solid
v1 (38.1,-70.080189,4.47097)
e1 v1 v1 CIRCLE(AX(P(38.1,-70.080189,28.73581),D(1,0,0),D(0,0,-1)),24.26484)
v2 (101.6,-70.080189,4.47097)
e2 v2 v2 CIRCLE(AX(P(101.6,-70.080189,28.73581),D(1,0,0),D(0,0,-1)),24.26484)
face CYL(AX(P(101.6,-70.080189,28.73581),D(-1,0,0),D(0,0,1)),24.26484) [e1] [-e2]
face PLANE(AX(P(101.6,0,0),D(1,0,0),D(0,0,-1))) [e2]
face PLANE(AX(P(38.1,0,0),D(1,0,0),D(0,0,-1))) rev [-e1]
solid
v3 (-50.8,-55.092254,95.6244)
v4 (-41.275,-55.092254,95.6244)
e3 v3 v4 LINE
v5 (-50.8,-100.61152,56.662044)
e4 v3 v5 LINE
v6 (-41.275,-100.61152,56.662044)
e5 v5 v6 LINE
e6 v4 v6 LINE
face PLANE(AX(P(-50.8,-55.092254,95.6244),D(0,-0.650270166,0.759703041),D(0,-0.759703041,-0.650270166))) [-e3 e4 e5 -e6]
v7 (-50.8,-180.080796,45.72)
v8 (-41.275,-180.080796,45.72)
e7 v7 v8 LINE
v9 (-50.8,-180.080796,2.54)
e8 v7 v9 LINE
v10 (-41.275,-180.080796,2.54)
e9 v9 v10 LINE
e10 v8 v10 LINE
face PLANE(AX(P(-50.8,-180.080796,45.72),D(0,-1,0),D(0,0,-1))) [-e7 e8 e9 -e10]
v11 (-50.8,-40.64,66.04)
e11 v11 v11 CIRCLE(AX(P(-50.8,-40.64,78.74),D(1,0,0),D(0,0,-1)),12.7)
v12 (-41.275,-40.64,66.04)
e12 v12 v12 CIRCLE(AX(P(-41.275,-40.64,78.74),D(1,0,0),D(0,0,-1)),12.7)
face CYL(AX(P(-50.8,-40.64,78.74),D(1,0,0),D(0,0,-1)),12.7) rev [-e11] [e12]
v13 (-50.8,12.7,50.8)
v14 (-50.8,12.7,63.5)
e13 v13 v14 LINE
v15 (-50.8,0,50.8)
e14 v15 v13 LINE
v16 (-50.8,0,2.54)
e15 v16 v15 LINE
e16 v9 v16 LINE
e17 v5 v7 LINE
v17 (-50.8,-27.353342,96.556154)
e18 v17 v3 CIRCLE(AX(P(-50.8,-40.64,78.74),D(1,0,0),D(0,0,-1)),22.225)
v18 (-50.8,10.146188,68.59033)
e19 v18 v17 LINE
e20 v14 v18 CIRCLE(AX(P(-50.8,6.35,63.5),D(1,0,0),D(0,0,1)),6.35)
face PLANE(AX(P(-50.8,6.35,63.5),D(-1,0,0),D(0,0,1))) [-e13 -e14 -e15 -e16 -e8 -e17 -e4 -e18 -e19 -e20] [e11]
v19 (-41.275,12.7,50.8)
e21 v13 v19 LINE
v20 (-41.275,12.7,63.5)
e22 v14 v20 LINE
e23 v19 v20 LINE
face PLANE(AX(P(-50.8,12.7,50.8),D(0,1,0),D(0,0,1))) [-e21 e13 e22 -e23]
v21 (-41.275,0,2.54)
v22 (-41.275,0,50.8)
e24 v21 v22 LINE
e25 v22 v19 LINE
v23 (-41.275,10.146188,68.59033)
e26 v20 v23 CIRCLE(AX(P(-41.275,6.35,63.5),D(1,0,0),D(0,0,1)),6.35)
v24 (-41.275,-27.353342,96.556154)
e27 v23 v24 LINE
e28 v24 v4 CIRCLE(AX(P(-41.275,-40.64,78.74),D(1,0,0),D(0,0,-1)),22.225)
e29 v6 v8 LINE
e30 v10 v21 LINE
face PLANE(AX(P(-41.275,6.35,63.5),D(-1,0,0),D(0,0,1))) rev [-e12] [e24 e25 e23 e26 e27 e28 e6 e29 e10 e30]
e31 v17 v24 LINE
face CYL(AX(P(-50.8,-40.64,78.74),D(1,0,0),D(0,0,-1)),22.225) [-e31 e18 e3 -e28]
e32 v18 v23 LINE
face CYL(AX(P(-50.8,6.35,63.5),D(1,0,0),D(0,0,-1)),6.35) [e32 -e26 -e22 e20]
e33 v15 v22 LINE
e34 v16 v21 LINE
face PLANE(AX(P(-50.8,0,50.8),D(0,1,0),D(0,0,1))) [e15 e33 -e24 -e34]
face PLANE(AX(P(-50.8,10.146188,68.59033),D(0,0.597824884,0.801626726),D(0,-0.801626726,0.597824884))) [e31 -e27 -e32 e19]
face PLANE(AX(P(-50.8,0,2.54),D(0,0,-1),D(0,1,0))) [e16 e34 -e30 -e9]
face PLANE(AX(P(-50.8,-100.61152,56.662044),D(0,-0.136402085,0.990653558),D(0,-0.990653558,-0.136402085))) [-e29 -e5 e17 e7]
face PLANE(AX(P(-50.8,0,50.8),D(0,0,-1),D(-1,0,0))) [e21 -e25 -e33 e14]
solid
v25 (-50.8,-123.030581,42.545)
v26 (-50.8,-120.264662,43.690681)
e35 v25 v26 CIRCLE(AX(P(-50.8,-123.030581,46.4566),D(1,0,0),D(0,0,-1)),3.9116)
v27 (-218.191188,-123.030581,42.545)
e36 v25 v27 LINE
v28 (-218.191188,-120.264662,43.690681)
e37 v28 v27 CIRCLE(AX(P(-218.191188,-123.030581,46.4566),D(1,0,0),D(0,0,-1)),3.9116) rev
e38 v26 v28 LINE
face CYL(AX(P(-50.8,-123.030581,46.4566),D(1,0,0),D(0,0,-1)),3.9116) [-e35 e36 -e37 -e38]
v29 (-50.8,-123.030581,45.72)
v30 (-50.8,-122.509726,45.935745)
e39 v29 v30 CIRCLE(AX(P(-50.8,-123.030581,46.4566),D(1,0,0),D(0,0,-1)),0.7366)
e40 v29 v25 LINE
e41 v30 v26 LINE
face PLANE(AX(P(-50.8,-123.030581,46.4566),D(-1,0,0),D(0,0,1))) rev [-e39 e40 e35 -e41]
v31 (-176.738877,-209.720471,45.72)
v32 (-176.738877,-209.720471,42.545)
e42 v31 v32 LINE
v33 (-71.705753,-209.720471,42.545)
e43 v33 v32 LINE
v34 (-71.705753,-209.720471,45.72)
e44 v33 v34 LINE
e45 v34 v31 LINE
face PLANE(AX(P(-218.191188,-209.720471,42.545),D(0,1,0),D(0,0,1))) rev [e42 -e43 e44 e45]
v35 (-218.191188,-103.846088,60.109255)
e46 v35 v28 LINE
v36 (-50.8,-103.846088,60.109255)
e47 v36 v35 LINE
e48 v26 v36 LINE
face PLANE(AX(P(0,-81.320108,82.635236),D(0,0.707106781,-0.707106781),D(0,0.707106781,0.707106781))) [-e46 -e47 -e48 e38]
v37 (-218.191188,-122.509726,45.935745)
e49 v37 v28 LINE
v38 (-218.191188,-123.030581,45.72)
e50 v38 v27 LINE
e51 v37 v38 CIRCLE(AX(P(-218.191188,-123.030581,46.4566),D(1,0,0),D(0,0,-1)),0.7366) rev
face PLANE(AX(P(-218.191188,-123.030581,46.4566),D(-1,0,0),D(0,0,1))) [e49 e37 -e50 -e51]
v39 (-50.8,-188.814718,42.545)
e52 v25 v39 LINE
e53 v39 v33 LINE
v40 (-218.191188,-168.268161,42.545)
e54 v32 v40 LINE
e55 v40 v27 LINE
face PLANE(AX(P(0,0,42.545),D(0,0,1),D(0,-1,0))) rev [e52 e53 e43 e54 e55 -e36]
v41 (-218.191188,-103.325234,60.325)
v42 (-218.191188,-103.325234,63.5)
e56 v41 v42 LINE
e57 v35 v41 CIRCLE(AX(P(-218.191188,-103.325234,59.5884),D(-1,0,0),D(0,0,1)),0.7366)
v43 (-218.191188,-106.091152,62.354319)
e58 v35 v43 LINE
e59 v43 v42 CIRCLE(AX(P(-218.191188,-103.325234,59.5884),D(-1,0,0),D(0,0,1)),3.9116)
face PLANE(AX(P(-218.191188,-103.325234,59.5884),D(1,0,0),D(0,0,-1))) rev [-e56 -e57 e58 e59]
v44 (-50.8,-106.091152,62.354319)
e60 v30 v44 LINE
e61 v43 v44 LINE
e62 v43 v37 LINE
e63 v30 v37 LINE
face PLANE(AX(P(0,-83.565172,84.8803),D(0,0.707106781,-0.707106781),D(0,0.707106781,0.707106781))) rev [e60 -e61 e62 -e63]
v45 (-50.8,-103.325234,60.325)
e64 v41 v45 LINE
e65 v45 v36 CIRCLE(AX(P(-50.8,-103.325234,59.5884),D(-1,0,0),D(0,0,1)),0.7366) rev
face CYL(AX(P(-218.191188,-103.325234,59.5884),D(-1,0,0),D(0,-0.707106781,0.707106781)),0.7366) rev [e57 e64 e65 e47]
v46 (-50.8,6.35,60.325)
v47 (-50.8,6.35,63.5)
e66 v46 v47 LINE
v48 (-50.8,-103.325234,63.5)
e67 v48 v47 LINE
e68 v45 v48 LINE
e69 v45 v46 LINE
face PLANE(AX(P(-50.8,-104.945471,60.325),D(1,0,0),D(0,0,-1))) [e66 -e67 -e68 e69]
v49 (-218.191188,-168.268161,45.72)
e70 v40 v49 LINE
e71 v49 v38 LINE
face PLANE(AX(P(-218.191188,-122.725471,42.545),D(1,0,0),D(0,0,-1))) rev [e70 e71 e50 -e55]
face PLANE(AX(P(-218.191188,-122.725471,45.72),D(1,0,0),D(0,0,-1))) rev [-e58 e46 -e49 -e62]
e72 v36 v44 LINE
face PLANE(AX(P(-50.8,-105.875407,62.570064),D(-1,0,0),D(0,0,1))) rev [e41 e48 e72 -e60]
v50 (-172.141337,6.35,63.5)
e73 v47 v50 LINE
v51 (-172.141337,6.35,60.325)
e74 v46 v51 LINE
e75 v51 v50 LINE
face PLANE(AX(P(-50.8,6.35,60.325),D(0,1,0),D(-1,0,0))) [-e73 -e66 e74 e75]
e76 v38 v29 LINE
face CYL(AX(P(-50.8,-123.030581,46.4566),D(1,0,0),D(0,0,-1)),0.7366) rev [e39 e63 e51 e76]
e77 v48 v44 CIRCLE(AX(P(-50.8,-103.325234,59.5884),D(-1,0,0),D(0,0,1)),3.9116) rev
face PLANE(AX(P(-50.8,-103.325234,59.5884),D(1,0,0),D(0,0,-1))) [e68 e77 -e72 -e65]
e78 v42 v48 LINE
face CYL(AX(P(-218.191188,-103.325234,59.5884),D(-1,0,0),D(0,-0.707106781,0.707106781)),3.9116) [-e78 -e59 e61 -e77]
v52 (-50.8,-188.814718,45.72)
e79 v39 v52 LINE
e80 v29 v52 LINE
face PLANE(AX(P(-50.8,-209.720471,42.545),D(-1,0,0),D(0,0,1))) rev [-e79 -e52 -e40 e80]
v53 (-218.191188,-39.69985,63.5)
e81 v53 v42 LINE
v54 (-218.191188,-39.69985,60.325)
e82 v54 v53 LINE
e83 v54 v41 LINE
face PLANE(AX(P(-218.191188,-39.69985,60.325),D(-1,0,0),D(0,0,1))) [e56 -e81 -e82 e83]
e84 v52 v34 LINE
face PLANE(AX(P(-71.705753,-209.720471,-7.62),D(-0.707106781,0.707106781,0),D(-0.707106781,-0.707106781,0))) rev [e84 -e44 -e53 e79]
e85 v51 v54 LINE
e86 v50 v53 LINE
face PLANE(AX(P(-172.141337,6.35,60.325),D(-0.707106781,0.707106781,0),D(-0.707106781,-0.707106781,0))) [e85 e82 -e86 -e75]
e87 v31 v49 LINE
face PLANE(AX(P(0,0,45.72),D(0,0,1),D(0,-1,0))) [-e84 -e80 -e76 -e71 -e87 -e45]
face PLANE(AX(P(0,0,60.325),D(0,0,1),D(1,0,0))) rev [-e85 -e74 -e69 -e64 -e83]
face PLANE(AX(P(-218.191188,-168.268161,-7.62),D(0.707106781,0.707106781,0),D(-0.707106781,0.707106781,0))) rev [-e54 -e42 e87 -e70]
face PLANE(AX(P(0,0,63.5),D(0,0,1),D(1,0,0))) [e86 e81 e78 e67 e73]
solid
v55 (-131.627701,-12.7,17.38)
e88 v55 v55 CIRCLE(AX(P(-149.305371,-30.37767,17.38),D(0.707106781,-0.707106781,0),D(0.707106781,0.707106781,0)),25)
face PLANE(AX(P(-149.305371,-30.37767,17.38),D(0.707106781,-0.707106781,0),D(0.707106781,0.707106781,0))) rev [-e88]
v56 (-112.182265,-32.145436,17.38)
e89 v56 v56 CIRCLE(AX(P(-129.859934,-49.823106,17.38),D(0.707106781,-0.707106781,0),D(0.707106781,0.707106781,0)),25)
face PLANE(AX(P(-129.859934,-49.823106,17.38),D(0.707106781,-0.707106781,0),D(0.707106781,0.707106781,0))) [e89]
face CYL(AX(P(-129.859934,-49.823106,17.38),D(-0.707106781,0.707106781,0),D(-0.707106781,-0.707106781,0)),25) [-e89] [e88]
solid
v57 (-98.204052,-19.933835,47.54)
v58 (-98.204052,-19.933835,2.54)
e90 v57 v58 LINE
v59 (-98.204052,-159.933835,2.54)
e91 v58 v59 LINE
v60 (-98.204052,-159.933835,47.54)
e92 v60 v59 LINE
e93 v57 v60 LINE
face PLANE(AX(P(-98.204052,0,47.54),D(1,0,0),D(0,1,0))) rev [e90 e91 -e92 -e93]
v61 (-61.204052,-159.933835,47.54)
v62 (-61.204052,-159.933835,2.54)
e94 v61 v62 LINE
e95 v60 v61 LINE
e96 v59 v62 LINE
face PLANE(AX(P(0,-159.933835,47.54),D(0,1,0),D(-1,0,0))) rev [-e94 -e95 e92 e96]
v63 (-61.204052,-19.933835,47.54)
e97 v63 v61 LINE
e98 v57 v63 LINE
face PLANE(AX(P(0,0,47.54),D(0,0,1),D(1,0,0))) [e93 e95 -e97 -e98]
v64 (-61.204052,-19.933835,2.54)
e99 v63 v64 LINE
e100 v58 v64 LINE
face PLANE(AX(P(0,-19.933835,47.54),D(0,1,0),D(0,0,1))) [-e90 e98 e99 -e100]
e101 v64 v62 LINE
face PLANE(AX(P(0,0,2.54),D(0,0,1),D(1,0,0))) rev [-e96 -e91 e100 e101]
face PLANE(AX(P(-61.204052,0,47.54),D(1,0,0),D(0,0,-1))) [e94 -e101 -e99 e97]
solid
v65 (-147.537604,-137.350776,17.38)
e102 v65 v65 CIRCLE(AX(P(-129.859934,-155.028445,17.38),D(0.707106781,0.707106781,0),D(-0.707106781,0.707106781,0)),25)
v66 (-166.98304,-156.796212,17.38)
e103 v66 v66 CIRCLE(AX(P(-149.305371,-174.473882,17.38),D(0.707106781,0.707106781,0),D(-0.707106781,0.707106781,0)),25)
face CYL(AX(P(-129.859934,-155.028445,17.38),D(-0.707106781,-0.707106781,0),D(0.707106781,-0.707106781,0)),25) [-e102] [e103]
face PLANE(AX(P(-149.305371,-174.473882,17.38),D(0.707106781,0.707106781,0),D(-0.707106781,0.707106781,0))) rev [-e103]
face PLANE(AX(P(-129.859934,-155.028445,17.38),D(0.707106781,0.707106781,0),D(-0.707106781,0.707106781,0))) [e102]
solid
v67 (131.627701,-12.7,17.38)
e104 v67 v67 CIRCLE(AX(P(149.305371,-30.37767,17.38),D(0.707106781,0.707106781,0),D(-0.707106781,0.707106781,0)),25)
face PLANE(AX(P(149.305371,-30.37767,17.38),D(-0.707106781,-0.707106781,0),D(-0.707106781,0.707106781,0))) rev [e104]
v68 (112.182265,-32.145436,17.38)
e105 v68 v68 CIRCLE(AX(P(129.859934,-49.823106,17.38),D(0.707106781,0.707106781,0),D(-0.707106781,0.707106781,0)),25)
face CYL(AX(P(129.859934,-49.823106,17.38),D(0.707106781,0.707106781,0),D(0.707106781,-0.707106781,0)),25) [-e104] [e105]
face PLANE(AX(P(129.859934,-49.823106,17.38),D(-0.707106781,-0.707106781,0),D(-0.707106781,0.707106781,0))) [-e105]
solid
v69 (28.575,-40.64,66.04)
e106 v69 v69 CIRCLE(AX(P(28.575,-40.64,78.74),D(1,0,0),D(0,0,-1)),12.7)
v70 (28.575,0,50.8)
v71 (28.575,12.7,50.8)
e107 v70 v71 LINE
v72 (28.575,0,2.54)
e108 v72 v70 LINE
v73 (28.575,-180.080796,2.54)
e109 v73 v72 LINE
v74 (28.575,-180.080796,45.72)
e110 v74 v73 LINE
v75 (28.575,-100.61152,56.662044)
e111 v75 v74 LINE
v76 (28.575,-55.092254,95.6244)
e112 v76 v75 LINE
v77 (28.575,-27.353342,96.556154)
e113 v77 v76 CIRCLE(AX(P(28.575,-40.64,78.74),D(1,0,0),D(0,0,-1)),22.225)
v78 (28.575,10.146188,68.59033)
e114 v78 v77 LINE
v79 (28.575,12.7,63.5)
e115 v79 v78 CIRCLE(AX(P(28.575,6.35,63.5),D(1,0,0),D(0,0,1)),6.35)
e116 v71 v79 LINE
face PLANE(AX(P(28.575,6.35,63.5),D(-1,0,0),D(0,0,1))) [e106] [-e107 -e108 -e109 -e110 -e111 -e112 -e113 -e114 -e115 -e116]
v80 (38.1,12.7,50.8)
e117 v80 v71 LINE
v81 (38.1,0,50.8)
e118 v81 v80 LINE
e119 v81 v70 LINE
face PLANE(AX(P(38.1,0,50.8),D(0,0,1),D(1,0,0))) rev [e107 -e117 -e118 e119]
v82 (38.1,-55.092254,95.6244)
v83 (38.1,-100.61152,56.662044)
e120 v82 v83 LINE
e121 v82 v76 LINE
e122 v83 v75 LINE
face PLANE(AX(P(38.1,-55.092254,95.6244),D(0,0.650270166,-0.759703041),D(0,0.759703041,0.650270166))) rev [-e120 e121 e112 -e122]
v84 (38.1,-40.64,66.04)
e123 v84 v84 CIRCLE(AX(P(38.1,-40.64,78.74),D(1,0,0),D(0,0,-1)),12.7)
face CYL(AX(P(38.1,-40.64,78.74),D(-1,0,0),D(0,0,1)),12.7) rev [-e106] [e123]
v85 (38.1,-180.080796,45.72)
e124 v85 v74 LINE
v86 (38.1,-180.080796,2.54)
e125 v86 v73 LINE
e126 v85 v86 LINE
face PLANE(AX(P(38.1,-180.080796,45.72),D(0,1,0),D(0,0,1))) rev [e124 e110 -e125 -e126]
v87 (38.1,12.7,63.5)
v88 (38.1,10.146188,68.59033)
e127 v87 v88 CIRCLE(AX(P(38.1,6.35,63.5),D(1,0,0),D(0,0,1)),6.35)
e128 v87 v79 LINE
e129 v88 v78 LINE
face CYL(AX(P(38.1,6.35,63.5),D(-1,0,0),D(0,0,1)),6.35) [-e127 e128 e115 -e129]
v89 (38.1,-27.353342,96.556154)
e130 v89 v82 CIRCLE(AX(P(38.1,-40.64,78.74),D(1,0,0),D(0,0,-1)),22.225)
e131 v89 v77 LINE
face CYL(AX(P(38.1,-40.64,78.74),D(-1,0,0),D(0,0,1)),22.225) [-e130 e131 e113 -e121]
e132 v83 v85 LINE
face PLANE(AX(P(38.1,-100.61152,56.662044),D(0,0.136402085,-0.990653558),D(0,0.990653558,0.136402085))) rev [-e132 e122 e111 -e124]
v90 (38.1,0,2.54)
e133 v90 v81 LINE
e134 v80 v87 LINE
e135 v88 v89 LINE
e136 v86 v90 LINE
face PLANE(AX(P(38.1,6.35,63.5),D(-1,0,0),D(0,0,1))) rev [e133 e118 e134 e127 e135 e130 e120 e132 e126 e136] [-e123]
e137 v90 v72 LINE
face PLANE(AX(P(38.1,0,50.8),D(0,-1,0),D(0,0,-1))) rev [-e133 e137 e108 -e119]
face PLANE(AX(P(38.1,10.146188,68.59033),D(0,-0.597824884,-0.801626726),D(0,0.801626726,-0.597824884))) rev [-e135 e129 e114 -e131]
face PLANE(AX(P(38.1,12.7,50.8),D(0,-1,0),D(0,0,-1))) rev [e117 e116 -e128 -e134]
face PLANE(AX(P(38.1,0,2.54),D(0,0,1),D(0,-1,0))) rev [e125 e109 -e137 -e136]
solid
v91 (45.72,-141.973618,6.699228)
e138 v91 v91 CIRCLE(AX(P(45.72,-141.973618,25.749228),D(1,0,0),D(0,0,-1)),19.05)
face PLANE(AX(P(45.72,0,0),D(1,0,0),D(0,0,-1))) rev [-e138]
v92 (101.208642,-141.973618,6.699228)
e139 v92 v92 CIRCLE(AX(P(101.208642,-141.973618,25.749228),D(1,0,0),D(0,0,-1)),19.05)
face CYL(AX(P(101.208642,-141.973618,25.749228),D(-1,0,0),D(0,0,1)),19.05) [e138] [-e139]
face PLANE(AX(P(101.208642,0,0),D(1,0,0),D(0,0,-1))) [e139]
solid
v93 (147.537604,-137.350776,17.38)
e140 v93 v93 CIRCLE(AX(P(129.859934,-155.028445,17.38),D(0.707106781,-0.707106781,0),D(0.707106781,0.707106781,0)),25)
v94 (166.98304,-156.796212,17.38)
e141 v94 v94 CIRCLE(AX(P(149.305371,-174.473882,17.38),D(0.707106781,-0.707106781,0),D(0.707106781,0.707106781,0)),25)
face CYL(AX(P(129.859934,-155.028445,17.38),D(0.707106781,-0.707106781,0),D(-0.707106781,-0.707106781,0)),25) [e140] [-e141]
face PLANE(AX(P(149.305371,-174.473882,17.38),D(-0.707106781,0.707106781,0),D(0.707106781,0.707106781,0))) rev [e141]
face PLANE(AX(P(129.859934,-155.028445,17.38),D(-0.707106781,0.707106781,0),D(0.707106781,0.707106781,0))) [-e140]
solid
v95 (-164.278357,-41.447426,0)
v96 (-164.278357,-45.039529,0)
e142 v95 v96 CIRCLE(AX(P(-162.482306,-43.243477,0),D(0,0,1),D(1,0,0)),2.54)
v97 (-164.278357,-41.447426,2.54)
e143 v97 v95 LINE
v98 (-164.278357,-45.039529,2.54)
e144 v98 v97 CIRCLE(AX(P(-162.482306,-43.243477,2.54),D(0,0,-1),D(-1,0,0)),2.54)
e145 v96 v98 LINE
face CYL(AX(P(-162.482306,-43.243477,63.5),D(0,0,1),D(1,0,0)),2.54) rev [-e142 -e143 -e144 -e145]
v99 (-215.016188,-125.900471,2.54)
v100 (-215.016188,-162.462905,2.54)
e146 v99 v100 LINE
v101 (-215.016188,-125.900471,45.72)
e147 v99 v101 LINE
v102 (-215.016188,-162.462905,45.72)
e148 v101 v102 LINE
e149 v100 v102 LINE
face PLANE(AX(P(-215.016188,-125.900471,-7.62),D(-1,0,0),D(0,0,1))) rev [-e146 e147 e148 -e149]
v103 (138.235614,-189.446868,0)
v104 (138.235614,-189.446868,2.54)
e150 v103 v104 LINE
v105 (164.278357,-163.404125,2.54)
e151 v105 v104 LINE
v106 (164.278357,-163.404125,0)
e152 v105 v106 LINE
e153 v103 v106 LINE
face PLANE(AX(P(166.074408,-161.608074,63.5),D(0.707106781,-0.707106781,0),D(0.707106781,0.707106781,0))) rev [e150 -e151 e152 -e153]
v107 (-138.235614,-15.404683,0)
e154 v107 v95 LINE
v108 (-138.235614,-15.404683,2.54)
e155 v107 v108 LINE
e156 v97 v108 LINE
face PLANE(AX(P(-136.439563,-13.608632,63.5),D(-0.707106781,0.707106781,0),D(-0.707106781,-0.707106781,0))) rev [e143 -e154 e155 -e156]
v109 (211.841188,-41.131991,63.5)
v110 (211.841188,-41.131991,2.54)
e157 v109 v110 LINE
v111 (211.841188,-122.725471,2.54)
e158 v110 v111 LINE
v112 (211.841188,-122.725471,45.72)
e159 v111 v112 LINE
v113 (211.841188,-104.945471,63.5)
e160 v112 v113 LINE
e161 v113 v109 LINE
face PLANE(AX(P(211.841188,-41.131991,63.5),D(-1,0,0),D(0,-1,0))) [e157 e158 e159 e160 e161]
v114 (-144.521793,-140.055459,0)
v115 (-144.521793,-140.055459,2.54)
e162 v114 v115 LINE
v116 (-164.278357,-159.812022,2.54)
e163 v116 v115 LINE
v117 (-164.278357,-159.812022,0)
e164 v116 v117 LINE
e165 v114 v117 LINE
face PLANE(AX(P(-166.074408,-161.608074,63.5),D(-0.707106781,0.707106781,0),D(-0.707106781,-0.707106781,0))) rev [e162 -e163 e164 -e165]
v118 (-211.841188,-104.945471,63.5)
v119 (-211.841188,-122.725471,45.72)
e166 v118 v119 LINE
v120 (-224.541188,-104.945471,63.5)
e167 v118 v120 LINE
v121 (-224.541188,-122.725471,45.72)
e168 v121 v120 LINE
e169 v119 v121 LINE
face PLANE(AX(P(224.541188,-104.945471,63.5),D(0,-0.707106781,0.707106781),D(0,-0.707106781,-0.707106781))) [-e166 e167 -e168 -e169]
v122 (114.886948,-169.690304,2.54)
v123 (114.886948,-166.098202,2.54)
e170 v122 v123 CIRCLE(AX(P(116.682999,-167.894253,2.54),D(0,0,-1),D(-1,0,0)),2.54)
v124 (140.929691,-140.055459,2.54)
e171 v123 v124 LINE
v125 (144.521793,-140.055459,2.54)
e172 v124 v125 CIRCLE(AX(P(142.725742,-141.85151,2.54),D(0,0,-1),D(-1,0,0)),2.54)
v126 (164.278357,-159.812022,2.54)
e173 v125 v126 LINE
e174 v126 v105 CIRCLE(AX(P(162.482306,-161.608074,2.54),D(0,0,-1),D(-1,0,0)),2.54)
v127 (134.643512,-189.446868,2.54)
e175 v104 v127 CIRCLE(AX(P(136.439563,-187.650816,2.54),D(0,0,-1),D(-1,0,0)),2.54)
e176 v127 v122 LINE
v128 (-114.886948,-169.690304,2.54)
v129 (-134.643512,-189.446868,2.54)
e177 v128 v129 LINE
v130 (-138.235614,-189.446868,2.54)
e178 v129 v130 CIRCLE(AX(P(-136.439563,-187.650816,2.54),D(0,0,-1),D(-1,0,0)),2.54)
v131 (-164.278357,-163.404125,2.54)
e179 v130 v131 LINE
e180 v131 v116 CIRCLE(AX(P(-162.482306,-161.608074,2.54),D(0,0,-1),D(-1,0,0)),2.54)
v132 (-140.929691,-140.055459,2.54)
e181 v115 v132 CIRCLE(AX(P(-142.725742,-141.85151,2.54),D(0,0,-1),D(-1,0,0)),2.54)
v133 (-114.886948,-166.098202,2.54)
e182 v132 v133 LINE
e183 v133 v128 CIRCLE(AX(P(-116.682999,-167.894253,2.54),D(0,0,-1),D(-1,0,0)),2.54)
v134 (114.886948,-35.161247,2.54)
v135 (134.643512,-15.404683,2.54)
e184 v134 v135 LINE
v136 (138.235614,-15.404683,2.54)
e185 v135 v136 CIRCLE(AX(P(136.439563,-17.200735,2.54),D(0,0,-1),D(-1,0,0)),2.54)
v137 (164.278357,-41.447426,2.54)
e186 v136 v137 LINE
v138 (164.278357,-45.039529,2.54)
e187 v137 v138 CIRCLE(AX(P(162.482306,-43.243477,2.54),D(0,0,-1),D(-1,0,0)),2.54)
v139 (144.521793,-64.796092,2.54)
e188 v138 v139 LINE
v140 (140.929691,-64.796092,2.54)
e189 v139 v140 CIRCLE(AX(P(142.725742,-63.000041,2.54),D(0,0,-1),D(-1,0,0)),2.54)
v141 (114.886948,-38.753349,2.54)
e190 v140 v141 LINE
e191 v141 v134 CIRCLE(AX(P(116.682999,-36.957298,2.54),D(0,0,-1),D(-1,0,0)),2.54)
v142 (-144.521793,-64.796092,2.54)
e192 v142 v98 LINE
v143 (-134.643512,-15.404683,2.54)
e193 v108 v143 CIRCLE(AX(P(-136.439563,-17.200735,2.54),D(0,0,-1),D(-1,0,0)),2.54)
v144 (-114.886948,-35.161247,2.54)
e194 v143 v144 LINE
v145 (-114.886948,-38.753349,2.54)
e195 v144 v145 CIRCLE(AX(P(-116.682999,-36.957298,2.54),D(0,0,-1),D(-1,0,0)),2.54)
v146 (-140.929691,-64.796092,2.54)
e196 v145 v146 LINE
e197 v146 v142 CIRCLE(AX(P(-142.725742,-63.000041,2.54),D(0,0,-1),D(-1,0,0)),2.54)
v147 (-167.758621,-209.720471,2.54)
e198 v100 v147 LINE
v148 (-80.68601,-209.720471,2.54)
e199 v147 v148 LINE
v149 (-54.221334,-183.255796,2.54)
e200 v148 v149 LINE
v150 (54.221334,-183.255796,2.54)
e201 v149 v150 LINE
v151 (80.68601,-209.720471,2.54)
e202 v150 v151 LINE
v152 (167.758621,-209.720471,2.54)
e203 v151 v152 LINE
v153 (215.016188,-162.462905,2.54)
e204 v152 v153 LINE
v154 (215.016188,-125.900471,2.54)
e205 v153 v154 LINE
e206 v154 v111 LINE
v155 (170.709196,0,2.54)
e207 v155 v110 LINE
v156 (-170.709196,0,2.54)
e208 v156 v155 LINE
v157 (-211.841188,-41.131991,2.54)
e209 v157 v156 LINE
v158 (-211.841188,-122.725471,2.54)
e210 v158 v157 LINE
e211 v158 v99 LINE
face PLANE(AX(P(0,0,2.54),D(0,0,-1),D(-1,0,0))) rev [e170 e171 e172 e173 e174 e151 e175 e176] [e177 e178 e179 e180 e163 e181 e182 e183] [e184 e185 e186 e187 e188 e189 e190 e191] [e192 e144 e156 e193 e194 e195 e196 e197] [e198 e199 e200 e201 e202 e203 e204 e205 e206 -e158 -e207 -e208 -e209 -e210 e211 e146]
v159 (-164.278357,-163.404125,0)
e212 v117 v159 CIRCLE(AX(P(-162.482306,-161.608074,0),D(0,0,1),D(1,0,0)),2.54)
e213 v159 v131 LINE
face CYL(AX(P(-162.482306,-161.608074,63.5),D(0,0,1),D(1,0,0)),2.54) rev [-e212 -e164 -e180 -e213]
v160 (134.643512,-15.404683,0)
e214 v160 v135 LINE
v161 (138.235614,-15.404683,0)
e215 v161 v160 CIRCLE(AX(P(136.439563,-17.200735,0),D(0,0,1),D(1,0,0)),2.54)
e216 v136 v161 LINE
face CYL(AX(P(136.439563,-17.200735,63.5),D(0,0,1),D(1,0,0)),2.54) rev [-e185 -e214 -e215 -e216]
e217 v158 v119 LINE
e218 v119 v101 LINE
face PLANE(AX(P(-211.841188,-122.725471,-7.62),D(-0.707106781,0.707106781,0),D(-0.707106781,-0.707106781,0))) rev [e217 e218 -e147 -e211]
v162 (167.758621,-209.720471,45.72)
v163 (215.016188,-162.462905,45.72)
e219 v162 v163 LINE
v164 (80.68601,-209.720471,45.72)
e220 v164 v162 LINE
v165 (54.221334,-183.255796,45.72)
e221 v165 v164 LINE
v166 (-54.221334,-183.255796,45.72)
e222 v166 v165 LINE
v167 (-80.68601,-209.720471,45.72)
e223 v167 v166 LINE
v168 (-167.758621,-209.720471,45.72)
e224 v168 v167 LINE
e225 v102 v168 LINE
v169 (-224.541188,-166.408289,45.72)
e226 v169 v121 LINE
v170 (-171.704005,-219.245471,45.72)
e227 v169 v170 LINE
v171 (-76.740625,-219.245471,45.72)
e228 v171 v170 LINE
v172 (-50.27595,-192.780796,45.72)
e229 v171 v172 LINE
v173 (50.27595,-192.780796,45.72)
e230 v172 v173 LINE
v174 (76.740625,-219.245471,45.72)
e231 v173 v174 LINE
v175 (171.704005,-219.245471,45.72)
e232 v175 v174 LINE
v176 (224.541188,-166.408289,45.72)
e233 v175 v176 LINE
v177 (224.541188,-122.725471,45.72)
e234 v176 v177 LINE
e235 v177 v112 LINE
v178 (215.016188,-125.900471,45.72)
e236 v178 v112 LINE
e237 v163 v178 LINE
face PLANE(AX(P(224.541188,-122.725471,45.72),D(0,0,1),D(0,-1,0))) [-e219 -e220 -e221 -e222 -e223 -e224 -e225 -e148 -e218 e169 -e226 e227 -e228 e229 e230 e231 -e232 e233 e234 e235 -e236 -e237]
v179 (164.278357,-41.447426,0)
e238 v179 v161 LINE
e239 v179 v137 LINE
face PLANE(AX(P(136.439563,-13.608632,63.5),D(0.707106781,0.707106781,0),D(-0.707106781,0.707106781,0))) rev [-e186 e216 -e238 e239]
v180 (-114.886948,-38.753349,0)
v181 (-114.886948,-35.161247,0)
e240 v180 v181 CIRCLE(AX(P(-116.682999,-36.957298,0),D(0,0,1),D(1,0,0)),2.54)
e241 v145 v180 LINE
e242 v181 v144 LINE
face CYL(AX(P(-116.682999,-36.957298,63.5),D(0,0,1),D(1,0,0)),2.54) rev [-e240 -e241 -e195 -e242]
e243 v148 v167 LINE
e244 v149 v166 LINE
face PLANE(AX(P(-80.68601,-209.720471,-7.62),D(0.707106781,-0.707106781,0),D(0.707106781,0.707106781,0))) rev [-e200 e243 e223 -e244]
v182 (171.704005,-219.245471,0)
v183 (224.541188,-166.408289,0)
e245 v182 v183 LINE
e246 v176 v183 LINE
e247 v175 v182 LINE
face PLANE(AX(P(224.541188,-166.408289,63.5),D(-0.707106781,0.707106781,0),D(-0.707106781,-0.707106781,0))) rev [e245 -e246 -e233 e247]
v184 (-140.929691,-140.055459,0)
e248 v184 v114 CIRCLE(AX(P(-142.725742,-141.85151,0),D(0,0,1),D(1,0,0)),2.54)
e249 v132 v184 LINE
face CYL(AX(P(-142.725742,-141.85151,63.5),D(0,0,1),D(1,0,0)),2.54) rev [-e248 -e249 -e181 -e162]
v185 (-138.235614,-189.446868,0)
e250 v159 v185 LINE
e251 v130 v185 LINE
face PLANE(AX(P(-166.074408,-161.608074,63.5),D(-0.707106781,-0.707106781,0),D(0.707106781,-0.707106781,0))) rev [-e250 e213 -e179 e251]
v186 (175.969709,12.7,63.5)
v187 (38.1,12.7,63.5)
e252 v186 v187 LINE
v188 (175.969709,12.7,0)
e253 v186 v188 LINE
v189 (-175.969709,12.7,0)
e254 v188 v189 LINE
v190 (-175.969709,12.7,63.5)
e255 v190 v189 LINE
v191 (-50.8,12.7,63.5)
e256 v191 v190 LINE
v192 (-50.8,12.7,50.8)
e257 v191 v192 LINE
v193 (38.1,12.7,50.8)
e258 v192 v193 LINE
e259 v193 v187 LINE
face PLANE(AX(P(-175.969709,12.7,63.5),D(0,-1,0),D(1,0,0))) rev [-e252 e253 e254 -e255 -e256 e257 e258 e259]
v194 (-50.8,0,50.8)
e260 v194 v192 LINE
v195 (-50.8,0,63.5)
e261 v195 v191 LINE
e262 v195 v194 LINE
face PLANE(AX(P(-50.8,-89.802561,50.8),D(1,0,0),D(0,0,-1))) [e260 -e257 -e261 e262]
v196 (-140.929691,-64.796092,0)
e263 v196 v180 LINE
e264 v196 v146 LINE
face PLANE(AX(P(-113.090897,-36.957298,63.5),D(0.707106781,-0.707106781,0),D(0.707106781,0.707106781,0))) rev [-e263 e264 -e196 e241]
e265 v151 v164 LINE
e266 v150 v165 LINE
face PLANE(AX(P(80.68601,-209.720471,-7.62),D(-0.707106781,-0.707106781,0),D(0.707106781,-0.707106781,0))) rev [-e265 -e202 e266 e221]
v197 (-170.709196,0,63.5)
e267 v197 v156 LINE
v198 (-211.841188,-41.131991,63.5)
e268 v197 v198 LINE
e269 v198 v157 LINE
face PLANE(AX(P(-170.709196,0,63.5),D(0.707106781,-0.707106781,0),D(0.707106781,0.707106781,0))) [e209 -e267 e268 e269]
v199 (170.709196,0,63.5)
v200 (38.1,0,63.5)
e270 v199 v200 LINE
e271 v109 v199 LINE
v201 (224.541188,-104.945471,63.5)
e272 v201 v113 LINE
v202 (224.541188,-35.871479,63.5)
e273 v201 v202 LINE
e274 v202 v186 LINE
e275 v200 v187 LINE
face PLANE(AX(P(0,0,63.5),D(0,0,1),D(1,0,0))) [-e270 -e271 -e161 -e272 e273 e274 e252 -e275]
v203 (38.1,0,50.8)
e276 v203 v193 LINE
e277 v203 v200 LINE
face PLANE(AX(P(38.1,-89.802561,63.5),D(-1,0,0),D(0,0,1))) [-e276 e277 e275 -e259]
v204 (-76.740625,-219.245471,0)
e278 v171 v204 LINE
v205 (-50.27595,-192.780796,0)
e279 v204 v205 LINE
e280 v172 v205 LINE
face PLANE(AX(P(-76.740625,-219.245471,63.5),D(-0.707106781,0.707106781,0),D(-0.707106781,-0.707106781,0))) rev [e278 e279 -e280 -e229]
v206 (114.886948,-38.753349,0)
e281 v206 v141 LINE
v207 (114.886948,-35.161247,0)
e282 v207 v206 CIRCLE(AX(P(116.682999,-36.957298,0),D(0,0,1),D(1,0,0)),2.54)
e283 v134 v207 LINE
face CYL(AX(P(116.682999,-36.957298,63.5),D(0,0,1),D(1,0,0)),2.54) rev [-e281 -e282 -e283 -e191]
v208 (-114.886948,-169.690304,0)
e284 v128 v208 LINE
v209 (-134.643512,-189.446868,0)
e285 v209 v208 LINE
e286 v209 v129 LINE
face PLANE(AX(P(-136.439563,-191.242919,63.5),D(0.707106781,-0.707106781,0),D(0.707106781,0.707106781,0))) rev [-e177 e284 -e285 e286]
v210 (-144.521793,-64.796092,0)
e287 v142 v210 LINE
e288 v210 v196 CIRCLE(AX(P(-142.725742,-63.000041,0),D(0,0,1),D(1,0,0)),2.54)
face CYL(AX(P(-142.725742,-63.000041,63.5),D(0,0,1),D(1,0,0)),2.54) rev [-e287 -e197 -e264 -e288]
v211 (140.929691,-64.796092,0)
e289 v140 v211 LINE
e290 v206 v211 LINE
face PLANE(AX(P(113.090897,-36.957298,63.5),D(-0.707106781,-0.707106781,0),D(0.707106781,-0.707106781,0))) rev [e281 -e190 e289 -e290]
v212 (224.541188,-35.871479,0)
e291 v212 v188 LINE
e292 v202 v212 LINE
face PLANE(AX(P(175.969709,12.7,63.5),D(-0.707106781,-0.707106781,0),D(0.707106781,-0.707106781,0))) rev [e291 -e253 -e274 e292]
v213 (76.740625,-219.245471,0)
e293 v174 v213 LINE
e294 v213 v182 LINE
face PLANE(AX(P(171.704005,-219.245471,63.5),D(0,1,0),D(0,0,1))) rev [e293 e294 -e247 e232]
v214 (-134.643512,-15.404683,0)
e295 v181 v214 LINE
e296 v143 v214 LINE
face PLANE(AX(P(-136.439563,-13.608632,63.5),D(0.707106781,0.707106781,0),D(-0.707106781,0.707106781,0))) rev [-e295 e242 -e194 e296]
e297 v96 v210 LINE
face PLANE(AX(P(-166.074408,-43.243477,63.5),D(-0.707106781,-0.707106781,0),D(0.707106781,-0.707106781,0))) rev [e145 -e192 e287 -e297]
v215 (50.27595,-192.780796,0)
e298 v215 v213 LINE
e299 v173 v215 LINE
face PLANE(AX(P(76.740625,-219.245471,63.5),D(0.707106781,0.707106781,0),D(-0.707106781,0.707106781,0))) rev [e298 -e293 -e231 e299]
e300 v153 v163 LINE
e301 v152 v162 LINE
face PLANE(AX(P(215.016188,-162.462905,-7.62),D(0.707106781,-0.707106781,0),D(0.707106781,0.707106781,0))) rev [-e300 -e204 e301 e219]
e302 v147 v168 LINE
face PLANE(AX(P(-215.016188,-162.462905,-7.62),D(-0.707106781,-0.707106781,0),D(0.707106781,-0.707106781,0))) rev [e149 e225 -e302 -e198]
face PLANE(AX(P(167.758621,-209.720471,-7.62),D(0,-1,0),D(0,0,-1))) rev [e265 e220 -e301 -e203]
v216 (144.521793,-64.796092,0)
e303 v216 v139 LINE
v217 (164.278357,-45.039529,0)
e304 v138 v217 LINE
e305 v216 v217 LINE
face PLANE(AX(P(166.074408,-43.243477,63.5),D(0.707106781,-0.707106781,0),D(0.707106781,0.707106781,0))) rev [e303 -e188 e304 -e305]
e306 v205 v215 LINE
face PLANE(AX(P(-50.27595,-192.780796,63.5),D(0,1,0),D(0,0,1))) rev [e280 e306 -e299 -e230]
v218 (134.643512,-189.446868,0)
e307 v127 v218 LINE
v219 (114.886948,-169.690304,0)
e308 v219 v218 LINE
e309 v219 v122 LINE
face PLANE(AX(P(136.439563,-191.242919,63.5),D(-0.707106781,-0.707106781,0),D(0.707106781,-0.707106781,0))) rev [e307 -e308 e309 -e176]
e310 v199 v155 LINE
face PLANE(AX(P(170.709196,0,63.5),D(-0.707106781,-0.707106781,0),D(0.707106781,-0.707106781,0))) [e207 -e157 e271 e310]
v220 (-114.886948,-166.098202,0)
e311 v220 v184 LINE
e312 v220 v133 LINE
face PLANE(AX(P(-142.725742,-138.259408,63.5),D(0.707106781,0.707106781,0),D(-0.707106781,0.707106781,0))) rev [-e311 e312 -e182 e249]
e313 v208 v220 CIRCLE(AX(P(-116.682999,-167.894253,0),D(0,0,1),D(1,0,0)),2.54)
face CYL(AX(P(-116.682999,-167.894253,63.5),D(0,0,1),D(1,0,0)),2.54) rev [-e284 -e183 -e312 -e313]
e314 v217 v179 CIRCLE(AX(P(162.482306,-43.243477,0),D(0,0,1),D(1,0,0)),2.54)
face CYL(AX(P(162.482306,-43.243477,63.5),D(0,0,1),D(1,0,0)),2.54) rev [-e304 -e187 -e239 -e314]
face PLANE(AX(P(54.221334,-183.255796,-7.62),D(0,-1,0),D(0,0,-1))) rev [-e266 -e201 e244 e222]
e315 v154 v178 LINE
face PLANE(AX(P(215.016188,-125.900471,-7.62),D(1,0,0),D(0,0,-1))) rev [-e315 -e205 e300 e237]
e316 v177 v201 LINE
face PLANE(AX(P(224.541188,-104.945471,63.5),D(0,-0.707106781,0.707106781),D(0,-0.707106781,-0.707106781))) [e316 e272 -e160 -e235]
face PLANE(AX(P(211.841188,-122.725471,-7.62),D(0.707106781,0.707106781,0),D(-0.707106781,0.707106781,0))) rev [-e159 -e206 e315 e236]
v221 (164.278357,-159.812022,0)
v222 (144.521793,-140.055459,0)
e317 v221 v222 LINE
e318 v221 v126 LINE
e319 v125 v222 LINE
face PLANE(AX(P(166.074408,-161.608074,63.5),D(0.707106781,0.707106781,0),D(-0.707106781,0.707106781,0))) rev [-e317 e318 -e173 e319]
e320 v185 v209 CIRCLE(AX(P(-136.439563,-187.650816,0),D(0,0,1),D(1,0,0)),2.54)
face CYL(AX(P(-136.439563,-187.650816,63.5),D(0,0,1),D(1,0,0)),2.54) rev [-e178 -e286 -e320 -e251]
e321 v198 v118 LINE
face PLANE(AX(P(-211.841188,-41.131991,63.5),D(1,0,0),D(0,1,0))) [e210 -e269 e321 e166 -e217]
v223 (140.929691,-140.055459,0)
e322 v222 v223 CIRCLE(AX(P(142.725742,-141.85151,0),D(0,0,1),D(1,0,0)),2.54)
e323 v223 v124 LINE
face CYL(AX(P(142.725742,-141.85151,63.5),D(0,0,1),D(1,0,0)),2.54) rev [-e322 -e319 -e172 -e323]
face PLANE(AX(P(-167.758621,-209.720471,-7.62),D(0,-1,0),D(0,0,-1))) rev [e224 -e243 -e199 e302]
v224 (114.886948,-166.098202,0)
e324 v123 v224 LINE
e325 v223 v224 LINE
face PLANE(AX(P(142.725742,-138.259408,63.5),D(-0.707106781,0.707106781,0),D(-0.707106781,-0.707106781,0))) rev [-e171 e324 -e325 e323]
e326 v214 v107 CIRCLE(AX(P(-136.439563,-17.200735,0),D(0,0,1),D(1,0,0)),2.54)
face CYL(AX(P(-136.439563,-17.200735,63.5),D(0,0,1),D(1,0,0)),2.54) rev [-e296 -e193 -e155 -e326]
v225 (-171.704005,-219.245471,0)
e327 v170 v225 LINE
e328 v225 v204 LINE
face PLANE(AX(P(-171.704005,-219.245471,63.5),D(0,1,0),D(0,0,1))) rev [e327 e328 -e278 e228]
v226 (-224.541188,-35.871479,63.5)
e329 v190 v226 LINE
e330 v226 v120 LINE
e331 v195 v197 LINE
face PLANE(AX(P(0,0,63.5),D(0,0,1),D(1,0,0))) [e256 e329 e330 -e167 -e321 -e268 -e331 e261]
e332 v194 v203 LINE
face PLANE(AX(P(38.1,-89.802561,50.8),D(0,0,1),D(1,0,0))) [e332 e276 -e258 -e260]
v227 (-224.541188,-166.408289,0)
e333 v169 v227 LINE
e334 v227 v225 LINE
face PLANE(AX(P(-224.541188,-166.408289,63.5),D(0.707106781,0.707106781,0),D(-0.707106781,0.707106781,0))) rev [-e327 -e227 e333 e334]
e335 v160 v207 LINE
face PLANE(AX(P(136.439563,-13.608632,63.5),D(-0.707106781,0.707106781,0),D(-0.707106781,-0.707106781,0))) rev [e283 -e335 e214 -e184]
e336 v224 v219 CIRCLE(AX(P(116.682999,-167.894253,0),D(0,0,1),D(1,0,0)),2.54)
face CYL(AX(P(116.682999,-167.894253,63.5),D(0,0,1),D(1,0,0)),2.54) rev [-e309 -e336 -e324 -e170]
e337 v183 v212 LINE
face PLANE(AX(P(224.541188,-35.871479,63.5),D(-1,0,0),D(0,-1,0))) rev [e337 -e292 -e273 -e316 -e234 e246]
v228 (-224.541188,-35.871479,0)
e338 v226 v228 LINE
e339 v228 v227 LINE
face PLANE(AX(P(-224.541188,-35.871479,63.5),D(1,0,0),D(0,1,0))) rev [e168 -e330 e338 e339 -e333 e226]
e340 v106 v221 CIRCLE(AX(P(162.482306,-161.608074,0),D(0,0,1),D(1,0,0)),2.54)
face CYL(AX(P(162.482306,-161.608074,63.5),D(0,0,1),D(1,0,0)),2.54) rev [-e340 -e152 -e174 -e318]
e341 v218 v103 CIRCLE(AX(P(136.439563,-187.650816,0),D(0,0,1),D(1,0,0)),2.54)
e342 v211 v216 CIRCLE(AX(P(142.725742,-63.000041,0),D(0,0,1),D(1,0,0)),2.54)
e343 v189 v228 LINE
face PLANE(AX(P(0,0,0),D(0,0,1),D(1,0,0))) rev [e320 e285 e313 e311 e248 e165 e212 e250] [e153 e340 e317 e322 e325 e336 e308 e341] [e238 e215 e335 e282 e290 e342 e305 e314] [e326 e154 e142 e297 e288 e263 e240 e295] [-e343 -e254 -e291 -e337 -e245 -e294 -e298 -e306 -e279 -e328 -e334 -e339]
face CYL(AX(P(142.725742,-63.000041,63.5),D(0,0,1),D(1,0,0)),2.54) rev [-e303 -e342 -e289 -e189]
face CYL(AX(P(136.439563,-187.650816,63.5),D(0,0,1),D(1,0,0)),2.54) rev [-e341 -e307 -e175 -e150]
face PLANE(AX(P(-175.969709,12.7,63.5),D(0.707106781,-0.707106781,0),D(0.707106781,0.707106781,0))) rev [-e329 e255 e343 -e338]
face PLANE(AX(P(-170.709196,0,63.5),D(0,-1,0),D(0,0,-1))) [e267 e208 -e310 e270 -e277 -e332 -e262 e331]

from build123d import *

# Parameters (mm, degrees)
TEMP_START              = 2.54
TEMP_BATTERY_OUTLINE_W  = 37
TEMP_BATTERY_OUTLINE_H  = 140
TEMP_BATTERY_DEPTH      = 45
TEMP_START_2            = 45.72
SIDEVIEW_SKETCH_R       = 19.05
TEMP_ARM_MOTOR_DEPTH    = 55.488642
TEMP_START_3            = 38.1
SKETCH9_3_R             = 24.264839711
TEMP_DISK_MOTOR_DEPTH   = 63.5
SKETCH2_R               = 25
TEMP_FRONT_WHEEL_DEPTH  = 27.5
SKETCH3_R               = 25
TEMP_BACK_WHEEL_DEPTH   = 27.5
BOSS_EXTRUDE14_DEPTH    = 63.5
CUT_EXTRUDE1_DEPTH      = 504.761656475
SKETCH13_W              = 88.9
SKETCH13_H              = 12.7
CUT_EXTRUDE2_DEPTH      = 12.7
CUT_EXTRUDE4_DEPTH      = 319.327625669
BILLET_BOTTOM_DEPTH     = 2.54
CUT_EXTRUDE3_DEPTH      = 321.186776216
CUT_EXTRUDE3_DEPTH_BACK = 321.186776216
L_START                 = -41.275
SKETCH8_R               = 12.7
L_UPRIGHT_DEPTH         = 9.525
R_START                 = 28.575
SKETCH8_5_R             = 12.7
R_UPRIGHT_DEPTH         = 9.525
FILLET1_R               = 2.54
BASE_FLANGE2_DEPTH      = 3.175
EDGE_FLANGE3_START      = -218.191187662
EDGE_FLANGE3_DEPTH      = 167.391187662
EDGE_FLANGE3_2_DEPTH    = 167.391187662
EDGE_FLANGE4_START      = -218.191187662
EDGE_FLANGE4_DEPTH      = 167.391187662
EDGE_FLANGE4_2_DEPTH    = 167.391187662
CUT_EXTRUDE5_DEPTH      = 319.652368089


# Read off the part's stored shape, not the designer's step: Temp Battery, Edge-Flange3, Edge-Flange4
# Sheet-metal steps are written as plain solids
with BuildPart() as part:
    # Temp Battery outline → Temp Battery (new body)
    with BuildSketch(Plane.XY.offset(TEMP_START)):
        with Locations((-79.704052147, -89.933835326)):
            Rectangle(TEMP_BATTERY_OUTLINE_W, TEMP_BATTERY_OUTLINE_H)
    extrude(amount=TEMP_BATTERY_DEPTH)


with BuildPart() as body_2:
    # Sideview Sketch → Temp Arm Motor (new body)
    with BuildSketch(Plane(origin=(0, 0, 0), x_dir=(0, 0, -1), z_dir=(1, 0, 0)).offset(TEMP_START_2)):
        with Locations((-25.749228435, -141.973618126)):
            Circle(SIDEVIEW_SKETCH_R)
    extrude(amount=TEMP_ARM_MOTOR_DEPTH)


with BuildPart() as body_3:
    # Sketch9<3> → Temp Disk Motor (new body)
    with BuildSketch(Plane(origin=(0, 0, 0), x_dir=(0, 0, -1), z_dir=(1, 0, 0)).offset(TEMP_START_3)):
        with Locations((-28.735809635, -70.080189422)):
            Circle(SKETCH9_3_R)
    extrude(amount=TEMP_DISK_MOTOR_DEPTH)


with BuildPart() as body_4:
    # Sketch2 → Temp Front Wheel (new body)
    with BuildSketch(Plane(origin=(-59.46385062, 59.46385062, 0), x_dir=(0, 0, 1), z_dir=(0.707106781186475, -0.7071067811866201, 0))):
        with Locations(Location((17.38, 127.05509626, 0), (0, 0, 270))):
            Circle(SKETCH2_R)
    extrude(amount=TEMP_FRONT_WHEEL_DEPTH)


with BuildPart() as body_5:
    # Sketch3 → Temp Back Wheel (new body)
    with BuildSketch(Plane(origin=(-161.889626162, -161.889626162, 0), x_dir=(0, 0, -1), z_dir=(0.7071067811866171, 0.7071067811864781, 0))):
        with Locations(Location((-17.38, -17.796824648, 0), (0, 0, 90))):
            Circle(SKETCH3_R)
    extrude(amount=TEMP_BACK_WHEEL_DEPTH)


with BuildPart() as body_6:
    # Mirror3: mirrored copy
    add(body_4.part.mirror(Plane(origin=(0, 0, 0), x_dir=(0, 0, 1), z_dir=(1, 0, 0))))


with BuildPart() as body_7:
    # Mirror3 2: mirrored copy
    add(body_5.part.mirror(Plane(origin=(0, 0, 0), x_dir=(0, 0, 1), z_dir=(1, 0, 0))))


with BuildPart() as body_8:
    # Sketch11 → Boss-Extrude14 (new body)
    with BuildSketch(Plane.XY):
        Polygon((-224.541187662, -166.408288725), (-171.704005038, -219.245471349), (-76.740625367, -219.245471349), (-50.275950129, -192.780796112), (50.275950129, -192.780796112), (76.740625367, -219.245471349), (171.704005038, -219.245471349), (224.541187662, -166.408288725), (224.541187662, -35.871479098), (175.969708564, 12.7), (-175.969708564, 12.7), (-224.541187662, -35.871479098), align=None)
        Polygon((-170.709196322, 0), (170.709196322, 0), (211.841187662, -41.13199134), (211.841187662, -161.147776483), (166.443492796, -206.545471349), (82.001137609, -206.545471349), (55.536462372, -180.080796112), (-55.536462372, -180.080796112), (-82.001137609, -206.545471349), (-166.443492796, -206.545471349), (-211.841187662, -161.147776483), (-211.841187662, -41.13199134), align=None, mode=Mode.SUBTRACT)
    extrude(amount=BOSS_EXTRUDE14_DEPTH)

    # Sketch12 → Cut-Extrude1 (cut, through all)
    with BuildSketch(Plane(origin=(-224.541187662, 0, 0), x_dir=(0, 0, -1), z_dir=(1, 0, 0))):
        Polygon((-63.5, -104.945471349), (-45.72, -122.725471349), (-45.72, -219.245471349), (-63.5, -219.245471349), align=None)
    extrude(amount=CUT_EXTRUDE1_DEPTH, mode=Mode.SUBTRACT)

    # Sketch13 → Cut-Extrude2 (cut)
    with BuildSketch(Plane(origin=(0, 12.7, 0), x_dir=(-1, 0, 0), z_dir=(0, -1, 0))):
        with Locations((6.35, -57.15)):
            Rectangle(SKETCH13_W, SKETCH13_H)
    extrude(amount=CUT_EXTRUDE2_DEPTH, mode=Mode.SUBTRACT)

    # Sketch31 → Cut-Extrude4 (cut, through all)
    with BuildSketch(Plane.XY.offset(45.72)):
        Polygon((-211.841187662, -122.725471349), (-215.016187662, -125.900471349), (-215.016187662, -162.462904543), (-167.758620856, -209.720471349), (-80.686009548, -209.720471349), (-54.221334311, -183.255796112), (0, -183.255796112), (54.221334311, -183.255796112), (80.686009548, -209.720471349), (167.758620856, -209.720471349), (215.016187662, -162.462904543), (215.016187662, -125.900471349), (211.841187662, -122.725471349), (211.841187662, -161.147776483), (166.443492796, -206.545471349), (82.001137609, -206.545471349), (55.536462372, -180.080796112), (0, -180.080796112), (-55.536462372, -180.080796112), (-82.001137609, -206.545471349), (-166.443492796, -206.545471349), (-211.841187662, -161.147776483), align=None)
    extrude(amount=-CUT_EXTRUDE4_DEPTH, mode=Mode.SUBTRACT)

    # Sketch14 → Billet Bottom (add)
    with BuildSketch(Plane(origin=(0, 0, 0), x_dir=(-1, 0, 0), z_dir=(0, 0, -1))):
        Polygon((224.541187662, -166.408288725), (224.541187662, -35.871479098), (175.969708564, 12.7), (-175.969708564, 12.7), (-224.541187662, -35.871479098), (-224.541187662, -166.408288725), (-171.704005038, -219.245471349), (-76.740625367, -219.245471349), (-50.275950129, -192.780796112), (50.275950129, -192.780796112), (76.740625367, -219.245471349), (171.704005038, -219.245471349), align=None)
    extrude(amount=-BILLET_BOTTOM_DEPTH)

    # Sketch15 → Cut-Extrude3 (cut, two sides: drawn at the far end of the back side and taken through both)
    with BuildSketch(Plane(origin=(0, 0, 0), x_dir=(-1, 0, 0), z_dir=(0, 0, -1)).offset(-CUT_EXTRUDE3_DEPTH_BACK)):
        Polygon((-136.439562886, -13.608632214), (-166.074408085, -43.243477413), (-142.72574217, -66.592143328), (-113.090896971, -36.957298129), align=None)
        Polygon((-166.074408085, -161.608073671), (-136.439562886, -191.24291887), (-113.090896971, -167.894252955), (-142.72574217, -138.259407756), align=None)
        Polygon((136.439562886, -13.608632214), (166.074408085, -43.243477413), (142.72574217, -66.592143328), (113.090896971, -36.957298129), align=None)
        Polygon((166.074408085, -161.608073671), (136.439562886, -191.24291887), (113.090896971, -167.894252955), (142.72574217, -138.259407756), align=None)
    extrude(amount=CUT_EXTRUDE3_DEPTH + CUT_EXTRUDE3_DEPTH_BACK, mode=Mode.SUBTRACT)

    # Fillet1
    fillet1_edges = [body_8.edges().sort_by_distance(p)[0] for p in [
        (113.090896971, -167.894252955, 1.27),
        (136.439562886, -191.24291887, 1.27),
        (166.074408085, -161.608073671, 1.27),
        (142.72574217, -138.259407756, 1.27),
        (-166.074408085, -43.243477413, 1.27),
        (-142.72574217, -66.592143328, 1.27),
        (-113.090896971, -36.957298129, 1.27),
        (-136.439562886, -13.608632214, 1.27),
        (-136.439562886, -191.24291887, 1.27),
        (-113.090896971, -167.894252955, 1.27),
        (-142.72574217, -138.259407756, 1.27),
        (-166.074408085, -161.608073671, 1.27),
        (142.72574217, -66.592143328, 1.27),
        (166.074408085, -43.243477413, 1.27),
        (136.439562886, -13.608632214, 1.27),
        (113.090896971, -36.957298129, 1.27),
    ]]
    fillet(fillet1_edges, radius=FILLET1_R)


with BuildPart() as body_9:
    # Sketch8 → L Upright (new body)
    with BuildSketch(Plane(origin=(0, 0, 0), x_dir=(0, 0, -1), z_dir=(1, 0, 0)).offset(L_START)):
        with BuildLine():
            Line((-50.8, 0), (-50.8, 12.7))
            Line((-50.8, 12.7), (-63.5, 12.7))
            ThreePointArc((-63.5, 12.7), (-66.347516998, 12.025750783), (-68.59032971, 10.146188014))
            Line((-68.59032971, 10.146188014), (-96.556153987, -27.35334195))
            ThreePointArc((-96.556153987, -27.35334195), (-100.952472396, -41.38612001), (-95.624400091, -55.092254445))
            Line((-95.624400091, -55.092254445), (-56.662044199, -100.611519823))
            Line((-56.662044199, -100.611519823), (-45.72, -180.080796112))
            Line((-45.72, -180.080796112), (-2.54, -180.080796112))
            Line((-2.54, -180.080796112), (-2.54, 0))
            Line((-2.54, 0), (-50.8, 0))
        make_face()
        with Locations((-78.74, -40.64)):
            Circle(SKETCH8_R, mode=Mode.SUBTRACT)
    extrude(amount=-L_UPRIGHT_DEPTH)


with BuildPart() as body_10:
    # Sketch8<5> → R Upright (new body)
    with BuildSketch(Plane(origin=(0, 0, 0), x_dir=(0, 0, -1), z_dir=(1, 0, 0)).offset(R_START)):
        with BuildLine():
            Line((-50.8, 0), (-50.8, 12.7))
            Line((-50.8, 12.7), (-63.5, 12.7))
            ThreePointArc((-63.5, 12.7), (-66.347516998, 12.025750783), (-68.59032971, 10.146188014))
            Line((-68.59032971, 10.146188014), (-96.556153987, -27.35334195))
            ThreePointArc((-96.556153987, -27.35334195), (-100.952472396, -41.38612001), (-95.624400091, -55.092254445))
            Line((-95.624400091, -55.092254445), (-56.662044199, -100.611519823))
            Line((-56.662044199, -100.611519823), (-45.72, -180.080796112))
            Line((-45.72, -180.080796112), (-2.54, -180.080796112))
            Line((-2.54, -180.080796112), (-2.54, 0))
            Line((-2.54, 0), (-50.8, 0))
        make_face()
        with Locations((-78.74, -40.64)):
            Circle(SKETCH8_5_R, mode=Mode.SUBTRACT)
    extrude(amount=R_UPRIGHT_DEPTH)


with BuildPart() as body_11:
    # Sketch17 → Base-Flange2 (new body)
    with BuildSketch(Plane.XY.offset(63.5)):
        Polygon((-218.191187662, -104.945471349), (-50.8, -104.945471349), (-50.8, 6.35), (-172.141337216, 6.35), (-218.191187662, -39.699850446), align=None)
    extrude(amount=-BASE_FLANGE2_DEPTH)

    # Edge-Flange3 outline → Edge-Flange3 (cut)
    with BuildSketch(Plane.YZ.offset(EDGE_FLANGE3_START)):
        with BuildLine():
            Line((-104.945471349, 63.5), (-104.945471349, 63.148658997))
            ThreePointArc((-104.945471349, 63.148658997), (-104.15418034, 63.411155789), (-103.325233579, 63.5))
            Line((-103.325233579, 63.5), (-104.945471349, 63.5))
        make_face()
    extrude(amount=EDGE_FLANGE3_DEPTH, mode=Mode.SUBTRACT)

    # Edge-Flange3 2 outline → Edge-Flange3 2 (add)
    with BuildSketch(Plane.YZ.offset(EDGE_FLANGE3_START)):
        with BuildLine():
            ThreePointArc((-104.945471349, 63.148658997), (-105.553985832, 62.80294164), (-106.091152464, 62.354318885))
            Line((-106.091152464, 62.354318885), (-122.725471349, 45.72))
            Line((-122.725471349, 45.72), (-120.480407319, 43.47493597))
            Line((-120.480407319, 43.47493597), (-103.846088434, 60.109254855))
            ThreePointArc((-103.846088434, 60.109254855), (-103.607118195, 60.268929664), (-103.325233579, 60.325))
            Line((-103.325233579, 60.325), (-104.945471349, 60.325))
            Line((-104.945471349, 60.325), (-104.945471349, 63.148658997))
        make_face()
    extrude(amount=EDGE_FLANGE3_2_DEPTH)

    # Edge-Flange4 outline → Edge-Flange4 (cut)
    with BuildSketch(Plane.YZ.offset(EDGE_FLANGE4_START)):
        with BuildLine():
            ThreePointArc((-120.264662174, 43.690681115), (-120.374724567, 43.584833845), (-120.488834353, 43.483363004))
            Line((-120.488834353, 43.483363004), (-120.480407319, 43.47493597))
            Line((-120.480407319, 43.47493597), (-120.264662174, 43.690681115))
        make_face()
    extrude(amount=EDGE_FLANGE4_DEPTH, mode=Mode.SUBTRACT)

    # Edge-Flange4 2 outline → Edge-Flange4 2 (add)
    with BuildSketch(Plane.YZ.offset(EDGE_FLANGE4_START)):
        with BuildLine():
            Line((-209.720471349, 42.545), (-123.030581059, 42.545))
            ThreePointArc((-123.030581059, 42.545), (-121.675866934, 42.787081749), (-120.488834353, 43.483363004))
            Line((-120.488834353, 43.483363004), (-122.725471349, 45.72))
            Line((-122.725471349, 45.72), (-122.509726204, 45.935745145))
            ThreePointArc((-122.509726204, 45.935745145), (-122.748696443, 45.776070336), (-123.030581059, 45.72))
            Line((-123.030581059, 45.72), (-209.720471349, 45.72))
            Line((-209.720471349, 45.72), (-209.720471349, 42.545))
        make_face()
    extrude(amount=EDGE_FLANGE4_2_DEPTH)

    # Sketch45 → Cut-Extrude5 (cut, through all)
    with BuildSketch(Plane.XY.offset(45.72)):
        Polygon((-71.705753427, -209.720471349), (-50.8, -188.814717922), (-50.8, -209.720471349), align=None)
        Polygon((-218.191187662, -168.268160664), (-176.738876977, -209.720471349), (-218.191187662, -209.720471349), align=None)
    extrude(amount=-CUT_EXTRUDE5_DEPTH, mode=Mode.SUBTRACT)


solid = Compound([part.part, body_2.part, body_3.part, body_4.part, body_5.part, body_6.part, body_7.part, body_8.part, body_9.part, body_10.part, body_11.part])
